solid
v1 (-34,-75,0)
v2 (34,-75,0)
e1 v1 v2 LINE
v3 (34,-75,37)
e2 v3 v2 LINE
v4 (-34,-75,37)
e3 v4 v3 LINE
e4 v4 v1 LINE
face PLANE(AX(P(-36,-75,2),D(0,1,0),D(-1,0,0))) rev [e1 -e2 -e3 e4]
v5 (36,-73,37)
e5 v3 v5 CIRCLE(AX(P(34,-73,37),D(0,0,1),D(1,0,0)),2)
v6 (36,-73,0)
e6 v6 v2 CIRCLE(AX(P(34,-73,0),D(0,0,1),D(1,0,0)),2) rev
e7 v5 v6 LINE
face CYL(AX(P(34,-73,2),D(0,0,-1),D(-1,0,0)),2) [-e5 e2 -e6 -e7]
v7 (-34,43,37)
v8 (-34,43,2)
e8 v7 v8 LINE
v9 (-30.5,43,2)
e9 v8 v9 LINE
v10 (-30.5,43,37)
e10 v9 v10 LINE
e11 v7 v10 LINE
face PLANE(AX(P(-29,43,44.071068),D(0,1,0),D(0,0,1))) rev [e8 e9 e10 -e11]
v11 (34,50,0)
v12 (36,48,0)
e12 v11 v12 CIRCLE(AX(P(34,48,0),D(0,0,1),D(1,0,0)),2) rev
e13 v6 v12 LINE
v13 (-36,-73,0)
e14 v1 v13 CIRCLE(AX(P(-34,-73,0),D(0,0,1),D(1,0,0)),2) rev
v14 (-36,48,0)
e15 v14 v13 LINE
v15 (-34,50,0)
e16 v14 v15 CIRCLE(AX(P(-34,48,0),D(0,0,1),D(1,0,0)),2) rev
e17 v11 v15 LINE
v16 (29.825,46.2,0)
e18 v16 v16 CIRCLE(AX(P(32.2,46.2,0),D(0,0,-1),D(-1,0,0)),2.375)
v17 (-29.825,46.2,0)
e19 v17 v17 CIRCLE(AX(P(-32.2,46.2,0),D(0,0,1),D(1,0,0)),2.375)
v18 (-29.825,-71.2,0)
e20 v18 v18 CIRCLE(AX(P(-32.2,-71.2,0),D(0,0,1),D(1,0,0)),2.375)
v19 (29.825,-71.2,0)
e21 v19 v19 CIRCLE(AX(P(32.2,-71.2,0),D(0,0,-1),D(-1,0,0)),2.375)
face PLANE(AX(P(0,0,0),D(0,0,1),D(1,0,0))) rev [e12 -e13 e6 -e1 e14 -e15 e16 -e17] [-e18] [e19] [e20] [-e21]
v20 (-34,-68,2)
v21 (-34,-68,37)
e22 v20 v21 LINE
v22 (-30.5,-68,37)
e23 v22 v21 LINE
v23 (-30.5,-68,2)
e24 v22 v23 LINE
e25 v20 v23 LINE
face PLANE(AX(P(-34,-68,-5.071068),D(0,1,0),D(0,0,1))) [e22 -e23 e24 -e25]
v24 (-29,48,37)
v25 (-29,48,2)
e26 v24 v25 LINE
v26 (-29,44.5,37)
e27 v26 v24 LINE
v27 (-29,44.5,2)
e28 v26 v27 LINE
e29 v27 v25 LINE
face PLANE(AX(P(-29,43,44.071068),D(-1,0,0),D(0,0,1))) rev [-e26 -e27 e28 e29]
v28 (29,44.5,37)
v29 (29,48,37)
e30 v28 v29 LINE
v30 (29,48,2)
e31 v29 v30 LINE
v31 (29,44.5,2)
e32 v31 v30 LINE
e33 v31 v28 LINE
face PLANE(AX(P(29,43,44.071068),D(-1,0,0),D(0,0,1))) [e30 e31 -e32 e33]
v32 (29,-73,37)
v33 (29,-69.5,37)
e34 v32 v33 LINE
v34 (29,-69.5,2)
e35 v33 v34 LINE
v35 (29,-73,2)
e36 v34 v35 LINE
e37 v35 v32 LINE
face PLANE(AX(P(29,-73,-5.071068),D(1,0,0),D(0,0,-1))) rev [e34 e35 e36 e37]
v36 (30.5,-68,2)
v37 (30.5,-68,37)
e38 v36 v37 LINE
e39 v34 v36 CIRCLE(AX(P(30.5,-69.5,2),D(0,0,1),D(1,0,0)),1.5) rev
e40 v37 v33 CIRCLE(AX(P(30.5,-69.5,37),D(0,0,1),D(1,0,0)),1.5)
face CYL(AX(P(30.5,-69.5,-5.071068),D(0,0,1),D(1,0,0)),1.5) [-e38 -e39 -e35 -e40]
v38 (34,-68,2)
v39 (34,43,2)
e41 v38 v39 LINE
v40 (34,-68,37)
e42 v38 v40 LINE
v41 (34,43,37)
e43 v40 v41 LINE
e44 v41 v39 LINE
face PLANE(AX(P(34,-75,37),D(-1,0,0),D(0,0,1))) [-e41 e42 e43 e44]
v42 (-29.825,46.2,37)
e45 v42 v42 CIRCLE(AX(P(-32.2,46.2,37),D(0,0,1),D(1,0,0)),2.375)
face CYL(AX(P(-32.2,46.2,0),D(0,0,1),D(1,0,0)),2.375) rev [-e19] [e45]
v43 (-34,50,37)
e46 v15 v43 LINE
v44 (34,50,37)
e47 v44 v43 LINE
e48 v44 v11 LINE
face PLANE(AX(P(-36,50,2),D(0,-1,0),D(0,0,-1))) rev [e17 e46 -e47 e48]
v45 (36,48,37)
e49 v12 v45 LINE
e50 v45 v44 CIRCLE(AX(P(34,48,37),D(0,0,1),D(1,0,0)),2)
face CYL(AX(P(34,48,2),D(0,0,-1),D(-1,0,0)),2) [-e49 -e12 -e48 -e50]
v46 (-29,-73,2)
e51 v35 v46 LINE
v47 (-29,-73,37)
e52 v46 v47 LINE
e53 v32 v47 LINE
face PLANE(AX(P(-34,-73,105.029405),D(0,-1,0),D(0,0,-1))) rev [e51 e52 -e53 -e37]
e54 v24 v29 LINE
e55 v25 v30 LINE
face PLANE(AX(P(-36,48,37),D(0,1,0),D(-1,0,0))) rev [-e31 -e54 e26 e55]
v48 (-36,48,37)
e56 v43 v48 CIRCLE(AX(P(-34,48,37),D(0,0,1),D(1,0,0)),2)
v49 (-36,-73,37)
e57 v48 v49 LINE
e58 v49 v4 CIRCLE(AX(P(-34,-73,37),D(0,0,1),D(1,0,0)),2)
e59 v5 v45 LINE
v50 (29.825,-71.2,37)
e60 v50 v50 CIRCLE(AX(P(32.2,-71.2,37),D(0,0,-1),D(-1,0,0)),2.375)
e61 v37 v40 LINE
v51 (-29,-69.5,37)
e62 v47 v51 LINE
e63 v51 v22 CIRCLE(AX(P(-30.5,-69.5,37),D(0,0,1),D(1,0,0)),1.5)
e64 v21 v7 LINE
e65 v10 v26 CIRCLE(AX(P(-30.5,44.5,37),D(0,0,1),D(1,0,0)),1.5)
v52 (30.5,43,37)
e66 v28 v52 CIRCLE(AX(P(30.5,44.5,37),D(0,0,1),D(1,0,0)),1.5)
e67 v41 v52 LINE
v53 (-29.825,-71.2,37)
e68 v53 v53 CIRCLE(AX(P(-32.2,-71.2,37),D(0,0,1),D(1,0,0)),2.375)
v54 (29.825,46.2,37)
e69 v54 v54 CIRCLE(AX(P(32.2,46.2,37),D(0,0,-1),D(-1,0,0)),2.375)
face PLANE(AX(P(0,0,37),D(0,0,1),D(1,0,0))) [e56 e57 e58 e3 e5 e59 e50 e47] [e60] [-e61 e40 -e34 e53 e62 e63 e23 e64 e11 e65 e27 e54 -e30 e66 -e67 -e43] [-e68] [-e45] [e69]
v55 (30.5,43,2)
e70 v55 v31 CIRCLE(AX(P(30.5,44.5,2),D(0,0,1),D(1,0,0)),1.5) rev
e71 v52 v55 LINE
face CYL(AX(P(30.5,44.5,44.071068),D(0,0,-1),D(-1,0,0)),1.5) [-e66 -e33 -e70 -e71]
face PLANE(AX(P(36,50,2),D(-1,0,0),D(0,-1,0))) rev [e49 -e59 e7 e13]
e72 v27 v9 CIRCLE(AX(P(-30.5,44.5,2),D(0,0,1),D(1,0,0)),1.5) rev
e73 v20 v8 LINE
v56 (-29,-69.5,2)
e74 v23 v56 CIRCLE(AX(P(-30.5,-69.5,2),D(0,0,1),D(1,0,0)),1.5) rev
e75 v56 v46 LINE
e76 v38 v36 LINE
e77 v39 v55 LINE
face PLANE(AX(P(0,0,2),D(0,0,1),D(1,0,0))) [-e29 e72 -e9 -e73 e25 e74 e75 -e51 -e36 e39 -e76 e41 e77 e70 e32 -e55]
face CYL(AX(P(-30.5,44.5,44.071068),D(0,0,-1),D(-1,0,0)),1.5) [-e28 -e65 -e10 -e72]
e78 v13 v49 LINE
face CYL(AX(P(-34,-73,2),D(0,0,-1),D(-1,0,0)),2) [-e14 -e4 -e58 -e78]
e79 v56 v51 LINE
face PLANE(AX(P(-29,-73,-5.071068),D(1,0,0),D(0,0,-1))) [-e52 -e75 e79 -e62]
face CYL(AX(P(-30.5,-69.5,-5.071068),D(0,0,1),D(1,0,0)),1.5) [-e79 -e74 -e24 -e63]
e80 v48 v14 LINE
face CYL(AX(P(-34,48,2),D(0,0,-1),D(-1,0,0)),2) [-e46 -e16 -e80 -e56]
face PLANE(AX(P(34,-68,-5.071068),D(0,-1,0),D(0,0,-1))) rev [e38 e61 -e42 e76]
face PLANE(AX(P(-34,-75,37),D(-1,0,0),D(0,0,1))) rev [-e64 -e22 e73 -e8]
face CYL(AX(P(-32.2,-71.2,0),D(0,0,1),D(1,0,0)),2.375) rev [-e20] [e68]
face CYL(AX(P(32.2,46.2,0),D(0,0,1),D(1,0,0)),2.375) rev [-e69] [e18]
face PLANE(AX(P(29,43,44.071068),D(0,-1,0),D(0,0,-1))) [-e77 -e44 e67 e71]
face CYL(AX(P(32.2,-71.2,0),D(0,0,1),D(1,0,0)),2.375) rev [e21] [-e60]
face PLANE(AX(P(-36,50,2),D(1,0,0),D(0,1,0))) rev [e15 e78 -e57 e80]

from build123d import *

# Parameters (mm, degrees)
SKETCH1_W            = 72
SKETCH1_H            = 125
BOSS_EXTRUDE1_DEPTH  = 2
SKETCH5_W            = 72
SKETCH5_H            = 2
BOSS_EXTRUDE3_DEPTH  = 35
SKETCH6_W            = 2
SKETCH6_H            = 125
BOSS_EXTRUDE4_DEPTH  = 35
SKETCH7_W            = 5
SKETCH7_H            = 5
BOSS_EXTRUDE5_DEPTH  = 35
FILLET2_R            = 1.5
SKETCH8_R            = 2.375
CUT_EXTRUDE2_DEPTH   = 92.049437121
FILLET2_OF_MIRROR4_R = 1.5
FILLET3_R            = 2
SKETCH12_W           = 68
SKETCH12_H           = 2
BOSS_EXTRUDE6_DEPTH  = 35
SKETCH13_W           = 5
SKETCH13_H           = 5
BOSS_EXTRUDE9_DEPTH  = 35
SKETCH14_R           = 2.375
CUT_EXTRUDE6_DEPTH   = 92.049437121
FILLET4_R            = 1.5
FILLET4_OF_MIRROR8_R = 1.5


with BuildPart() as part:
    # Sketch1 → Boss-Extrude1 (new body)
    with BuildSketch(Plane.XY):
        with Locations((0, -12.5)):
            Rectangle(SKETCH1_W, SKETCH1_H)
    extrude(amount=BOSS_EXTRUDE1_DEPTH)

    # Sketch5 → Boss-Extrude3 (add)
    with BuildSketch(Plane.XY.offset(2)):
        with Locations((0, 49)):
            Rectangle(SKETCH5_W, SKETCH5_H)
    extrude(amount=BOSS_EXTRUDE3_DEPTH)

    # Sketch6 → Boss-Extrude4 (add)
    with BuildSketch(Plane.XY.offset(2)):
        with Locations((-35, -12.5)):
            Rectangle(SKETCH6_W, SKETCH6_H)
    boss_extrude4 = extrude(amount=BOSS_EXTRUDE4_DEPTH)

    # Mirror2: Boss-Extrude4 across plane
    add(boss_extrude4.mirror(Plane(origin=(0, 0, 0), x_dir=(0, 0, 1), z_dir=(1, 0, 0))))

    # Sketch7 → Boss-Extrude5 (add)
    with BuildSketch(Plane.XY.offset(2)):
        with Locations((-31.5, 45.5)):
            Rectangle(SKETCH7_W, SKETCH7_H)
    boss_extrude5 = extrude(amount=BOSS_EXTRUDE5_DEPTH)

    # Fillet2
    fillet2_edges = [part.edges().sort_by_distance(p)[0] for p in [
        (-29, 43, 19.5),
    ]]
    fillet(fillet2_edges, radius=FILLET2_R)

    # Sketch8 → Cut-Extrude2 (cut, through all)
    with BuildSketch(Plane.XY.offset(37)):
        with Locations((-32.2, 46.2)):
            Circle(SKETCH8_R)
    cut_extrude2 = extrude(amount=-CUT_EXTRUDE2_DEPTH, mode=Mode.SUBTRACT)

    # Mirror4: Boss-Extrude5, Cut-Extrude2 across plane
    add(boss_extrude5.mirror(Plane(origin=(0, 0, 0), x_dir=(0, 0, 1), z_dir=(1, 0, 0))))
    add(cut_extrude2.mirror(Plane(origin=(0, 0, 0), x_dir=(0, 0, 1), z_dir=(1, 0, 0))), mode=Mode.SUBTRACT)

    # Fillet2 of Mirror4
    fillet2_of_mirror4_edges = [part.edges().sort_by_distance(p)[0] for p in [
        (29, 43, 19.5),
    ]]
    fillet(fillet2_of_mirror4_edges, radius=FILLET2_OF_MIRROR4_R)

    # Fillet3
    fillet3_edges = [part.edges().sort_by_distance(p)[0] for p in [
        (-36, 50, 18.5),
        (36, 50, 18.5),
        (-36, -75, 18.5),
        (36, -75, 18.5),
    ]]
    fillet(fillet3_edges, radius=FILLET3_R - 0.0001)  # a hair under: the kernel refuses the full size

    # Sketch12 → Boss-Extrude6 (add)
    with BuildSketch(Plane.XY.offset(2)):
        with Locations((0, -74)):
            Rectangle(SKETCH12_W, SKETCH12_H)
    extrude(amount=BOSS_EXTRUDE6_DEPTH)

    # Sketch13 → Boss-Extrude9 (add)
    with BuildSketch(Plane.XY.offset(37)):
        with Locations((-31.5, -70.5)):
            Rectangle(SKETCH13_W, SKETCH13_H)
    boss_extrude9 = extrude(amount=-BOSS_EXTRUDE9_DEPTH)

    # Sketch14 → Cut-Extrude6 (cut, through all)
    with BuildSketch(Plane.XY.offset(37)):
        with Locations((-32.2, -71.2)):
            Circle(SKETCH14_R)
    cut_extrude6 = extrude(amount=-CUT_EXTRUDE6_DEPTH, mode=Mode.SUBTRACT)

    # Fillet4
    fillet4_edges = [part.edges().sort_by_distance(p)[0] for p in [
        (-29, -68, 19.5),
    ]]
    fillet(fillet4_edges, radius=FILLET4_R)

    # Mirror8: Boss-Extrude9, Cut-Extrude6 across plane
    add(boss_extrude9.mirror(Plane(origin=(0, 0, 0), x_dir=(0, 0, 1), z_dir=(1, 0, 0))))
    add(cut_extrude6.mirror(Plane(origin=(0, 0, 0), x_dir=(0, 0, 1), z_dir=(1, 0, 0))), mode=Mode.SUBTRACT)

    # Fillet4 of Mirror8
    fillet4_of_mirror8_edges = [part.edges().sort_by_distance(p)[0] for p in [
        (29, -68, 19.5),
    ]]
    fillet(fillet4_of_mirror8_edges, radius=FILLET4_OF_MIRROR8_R)


solid = part.part
